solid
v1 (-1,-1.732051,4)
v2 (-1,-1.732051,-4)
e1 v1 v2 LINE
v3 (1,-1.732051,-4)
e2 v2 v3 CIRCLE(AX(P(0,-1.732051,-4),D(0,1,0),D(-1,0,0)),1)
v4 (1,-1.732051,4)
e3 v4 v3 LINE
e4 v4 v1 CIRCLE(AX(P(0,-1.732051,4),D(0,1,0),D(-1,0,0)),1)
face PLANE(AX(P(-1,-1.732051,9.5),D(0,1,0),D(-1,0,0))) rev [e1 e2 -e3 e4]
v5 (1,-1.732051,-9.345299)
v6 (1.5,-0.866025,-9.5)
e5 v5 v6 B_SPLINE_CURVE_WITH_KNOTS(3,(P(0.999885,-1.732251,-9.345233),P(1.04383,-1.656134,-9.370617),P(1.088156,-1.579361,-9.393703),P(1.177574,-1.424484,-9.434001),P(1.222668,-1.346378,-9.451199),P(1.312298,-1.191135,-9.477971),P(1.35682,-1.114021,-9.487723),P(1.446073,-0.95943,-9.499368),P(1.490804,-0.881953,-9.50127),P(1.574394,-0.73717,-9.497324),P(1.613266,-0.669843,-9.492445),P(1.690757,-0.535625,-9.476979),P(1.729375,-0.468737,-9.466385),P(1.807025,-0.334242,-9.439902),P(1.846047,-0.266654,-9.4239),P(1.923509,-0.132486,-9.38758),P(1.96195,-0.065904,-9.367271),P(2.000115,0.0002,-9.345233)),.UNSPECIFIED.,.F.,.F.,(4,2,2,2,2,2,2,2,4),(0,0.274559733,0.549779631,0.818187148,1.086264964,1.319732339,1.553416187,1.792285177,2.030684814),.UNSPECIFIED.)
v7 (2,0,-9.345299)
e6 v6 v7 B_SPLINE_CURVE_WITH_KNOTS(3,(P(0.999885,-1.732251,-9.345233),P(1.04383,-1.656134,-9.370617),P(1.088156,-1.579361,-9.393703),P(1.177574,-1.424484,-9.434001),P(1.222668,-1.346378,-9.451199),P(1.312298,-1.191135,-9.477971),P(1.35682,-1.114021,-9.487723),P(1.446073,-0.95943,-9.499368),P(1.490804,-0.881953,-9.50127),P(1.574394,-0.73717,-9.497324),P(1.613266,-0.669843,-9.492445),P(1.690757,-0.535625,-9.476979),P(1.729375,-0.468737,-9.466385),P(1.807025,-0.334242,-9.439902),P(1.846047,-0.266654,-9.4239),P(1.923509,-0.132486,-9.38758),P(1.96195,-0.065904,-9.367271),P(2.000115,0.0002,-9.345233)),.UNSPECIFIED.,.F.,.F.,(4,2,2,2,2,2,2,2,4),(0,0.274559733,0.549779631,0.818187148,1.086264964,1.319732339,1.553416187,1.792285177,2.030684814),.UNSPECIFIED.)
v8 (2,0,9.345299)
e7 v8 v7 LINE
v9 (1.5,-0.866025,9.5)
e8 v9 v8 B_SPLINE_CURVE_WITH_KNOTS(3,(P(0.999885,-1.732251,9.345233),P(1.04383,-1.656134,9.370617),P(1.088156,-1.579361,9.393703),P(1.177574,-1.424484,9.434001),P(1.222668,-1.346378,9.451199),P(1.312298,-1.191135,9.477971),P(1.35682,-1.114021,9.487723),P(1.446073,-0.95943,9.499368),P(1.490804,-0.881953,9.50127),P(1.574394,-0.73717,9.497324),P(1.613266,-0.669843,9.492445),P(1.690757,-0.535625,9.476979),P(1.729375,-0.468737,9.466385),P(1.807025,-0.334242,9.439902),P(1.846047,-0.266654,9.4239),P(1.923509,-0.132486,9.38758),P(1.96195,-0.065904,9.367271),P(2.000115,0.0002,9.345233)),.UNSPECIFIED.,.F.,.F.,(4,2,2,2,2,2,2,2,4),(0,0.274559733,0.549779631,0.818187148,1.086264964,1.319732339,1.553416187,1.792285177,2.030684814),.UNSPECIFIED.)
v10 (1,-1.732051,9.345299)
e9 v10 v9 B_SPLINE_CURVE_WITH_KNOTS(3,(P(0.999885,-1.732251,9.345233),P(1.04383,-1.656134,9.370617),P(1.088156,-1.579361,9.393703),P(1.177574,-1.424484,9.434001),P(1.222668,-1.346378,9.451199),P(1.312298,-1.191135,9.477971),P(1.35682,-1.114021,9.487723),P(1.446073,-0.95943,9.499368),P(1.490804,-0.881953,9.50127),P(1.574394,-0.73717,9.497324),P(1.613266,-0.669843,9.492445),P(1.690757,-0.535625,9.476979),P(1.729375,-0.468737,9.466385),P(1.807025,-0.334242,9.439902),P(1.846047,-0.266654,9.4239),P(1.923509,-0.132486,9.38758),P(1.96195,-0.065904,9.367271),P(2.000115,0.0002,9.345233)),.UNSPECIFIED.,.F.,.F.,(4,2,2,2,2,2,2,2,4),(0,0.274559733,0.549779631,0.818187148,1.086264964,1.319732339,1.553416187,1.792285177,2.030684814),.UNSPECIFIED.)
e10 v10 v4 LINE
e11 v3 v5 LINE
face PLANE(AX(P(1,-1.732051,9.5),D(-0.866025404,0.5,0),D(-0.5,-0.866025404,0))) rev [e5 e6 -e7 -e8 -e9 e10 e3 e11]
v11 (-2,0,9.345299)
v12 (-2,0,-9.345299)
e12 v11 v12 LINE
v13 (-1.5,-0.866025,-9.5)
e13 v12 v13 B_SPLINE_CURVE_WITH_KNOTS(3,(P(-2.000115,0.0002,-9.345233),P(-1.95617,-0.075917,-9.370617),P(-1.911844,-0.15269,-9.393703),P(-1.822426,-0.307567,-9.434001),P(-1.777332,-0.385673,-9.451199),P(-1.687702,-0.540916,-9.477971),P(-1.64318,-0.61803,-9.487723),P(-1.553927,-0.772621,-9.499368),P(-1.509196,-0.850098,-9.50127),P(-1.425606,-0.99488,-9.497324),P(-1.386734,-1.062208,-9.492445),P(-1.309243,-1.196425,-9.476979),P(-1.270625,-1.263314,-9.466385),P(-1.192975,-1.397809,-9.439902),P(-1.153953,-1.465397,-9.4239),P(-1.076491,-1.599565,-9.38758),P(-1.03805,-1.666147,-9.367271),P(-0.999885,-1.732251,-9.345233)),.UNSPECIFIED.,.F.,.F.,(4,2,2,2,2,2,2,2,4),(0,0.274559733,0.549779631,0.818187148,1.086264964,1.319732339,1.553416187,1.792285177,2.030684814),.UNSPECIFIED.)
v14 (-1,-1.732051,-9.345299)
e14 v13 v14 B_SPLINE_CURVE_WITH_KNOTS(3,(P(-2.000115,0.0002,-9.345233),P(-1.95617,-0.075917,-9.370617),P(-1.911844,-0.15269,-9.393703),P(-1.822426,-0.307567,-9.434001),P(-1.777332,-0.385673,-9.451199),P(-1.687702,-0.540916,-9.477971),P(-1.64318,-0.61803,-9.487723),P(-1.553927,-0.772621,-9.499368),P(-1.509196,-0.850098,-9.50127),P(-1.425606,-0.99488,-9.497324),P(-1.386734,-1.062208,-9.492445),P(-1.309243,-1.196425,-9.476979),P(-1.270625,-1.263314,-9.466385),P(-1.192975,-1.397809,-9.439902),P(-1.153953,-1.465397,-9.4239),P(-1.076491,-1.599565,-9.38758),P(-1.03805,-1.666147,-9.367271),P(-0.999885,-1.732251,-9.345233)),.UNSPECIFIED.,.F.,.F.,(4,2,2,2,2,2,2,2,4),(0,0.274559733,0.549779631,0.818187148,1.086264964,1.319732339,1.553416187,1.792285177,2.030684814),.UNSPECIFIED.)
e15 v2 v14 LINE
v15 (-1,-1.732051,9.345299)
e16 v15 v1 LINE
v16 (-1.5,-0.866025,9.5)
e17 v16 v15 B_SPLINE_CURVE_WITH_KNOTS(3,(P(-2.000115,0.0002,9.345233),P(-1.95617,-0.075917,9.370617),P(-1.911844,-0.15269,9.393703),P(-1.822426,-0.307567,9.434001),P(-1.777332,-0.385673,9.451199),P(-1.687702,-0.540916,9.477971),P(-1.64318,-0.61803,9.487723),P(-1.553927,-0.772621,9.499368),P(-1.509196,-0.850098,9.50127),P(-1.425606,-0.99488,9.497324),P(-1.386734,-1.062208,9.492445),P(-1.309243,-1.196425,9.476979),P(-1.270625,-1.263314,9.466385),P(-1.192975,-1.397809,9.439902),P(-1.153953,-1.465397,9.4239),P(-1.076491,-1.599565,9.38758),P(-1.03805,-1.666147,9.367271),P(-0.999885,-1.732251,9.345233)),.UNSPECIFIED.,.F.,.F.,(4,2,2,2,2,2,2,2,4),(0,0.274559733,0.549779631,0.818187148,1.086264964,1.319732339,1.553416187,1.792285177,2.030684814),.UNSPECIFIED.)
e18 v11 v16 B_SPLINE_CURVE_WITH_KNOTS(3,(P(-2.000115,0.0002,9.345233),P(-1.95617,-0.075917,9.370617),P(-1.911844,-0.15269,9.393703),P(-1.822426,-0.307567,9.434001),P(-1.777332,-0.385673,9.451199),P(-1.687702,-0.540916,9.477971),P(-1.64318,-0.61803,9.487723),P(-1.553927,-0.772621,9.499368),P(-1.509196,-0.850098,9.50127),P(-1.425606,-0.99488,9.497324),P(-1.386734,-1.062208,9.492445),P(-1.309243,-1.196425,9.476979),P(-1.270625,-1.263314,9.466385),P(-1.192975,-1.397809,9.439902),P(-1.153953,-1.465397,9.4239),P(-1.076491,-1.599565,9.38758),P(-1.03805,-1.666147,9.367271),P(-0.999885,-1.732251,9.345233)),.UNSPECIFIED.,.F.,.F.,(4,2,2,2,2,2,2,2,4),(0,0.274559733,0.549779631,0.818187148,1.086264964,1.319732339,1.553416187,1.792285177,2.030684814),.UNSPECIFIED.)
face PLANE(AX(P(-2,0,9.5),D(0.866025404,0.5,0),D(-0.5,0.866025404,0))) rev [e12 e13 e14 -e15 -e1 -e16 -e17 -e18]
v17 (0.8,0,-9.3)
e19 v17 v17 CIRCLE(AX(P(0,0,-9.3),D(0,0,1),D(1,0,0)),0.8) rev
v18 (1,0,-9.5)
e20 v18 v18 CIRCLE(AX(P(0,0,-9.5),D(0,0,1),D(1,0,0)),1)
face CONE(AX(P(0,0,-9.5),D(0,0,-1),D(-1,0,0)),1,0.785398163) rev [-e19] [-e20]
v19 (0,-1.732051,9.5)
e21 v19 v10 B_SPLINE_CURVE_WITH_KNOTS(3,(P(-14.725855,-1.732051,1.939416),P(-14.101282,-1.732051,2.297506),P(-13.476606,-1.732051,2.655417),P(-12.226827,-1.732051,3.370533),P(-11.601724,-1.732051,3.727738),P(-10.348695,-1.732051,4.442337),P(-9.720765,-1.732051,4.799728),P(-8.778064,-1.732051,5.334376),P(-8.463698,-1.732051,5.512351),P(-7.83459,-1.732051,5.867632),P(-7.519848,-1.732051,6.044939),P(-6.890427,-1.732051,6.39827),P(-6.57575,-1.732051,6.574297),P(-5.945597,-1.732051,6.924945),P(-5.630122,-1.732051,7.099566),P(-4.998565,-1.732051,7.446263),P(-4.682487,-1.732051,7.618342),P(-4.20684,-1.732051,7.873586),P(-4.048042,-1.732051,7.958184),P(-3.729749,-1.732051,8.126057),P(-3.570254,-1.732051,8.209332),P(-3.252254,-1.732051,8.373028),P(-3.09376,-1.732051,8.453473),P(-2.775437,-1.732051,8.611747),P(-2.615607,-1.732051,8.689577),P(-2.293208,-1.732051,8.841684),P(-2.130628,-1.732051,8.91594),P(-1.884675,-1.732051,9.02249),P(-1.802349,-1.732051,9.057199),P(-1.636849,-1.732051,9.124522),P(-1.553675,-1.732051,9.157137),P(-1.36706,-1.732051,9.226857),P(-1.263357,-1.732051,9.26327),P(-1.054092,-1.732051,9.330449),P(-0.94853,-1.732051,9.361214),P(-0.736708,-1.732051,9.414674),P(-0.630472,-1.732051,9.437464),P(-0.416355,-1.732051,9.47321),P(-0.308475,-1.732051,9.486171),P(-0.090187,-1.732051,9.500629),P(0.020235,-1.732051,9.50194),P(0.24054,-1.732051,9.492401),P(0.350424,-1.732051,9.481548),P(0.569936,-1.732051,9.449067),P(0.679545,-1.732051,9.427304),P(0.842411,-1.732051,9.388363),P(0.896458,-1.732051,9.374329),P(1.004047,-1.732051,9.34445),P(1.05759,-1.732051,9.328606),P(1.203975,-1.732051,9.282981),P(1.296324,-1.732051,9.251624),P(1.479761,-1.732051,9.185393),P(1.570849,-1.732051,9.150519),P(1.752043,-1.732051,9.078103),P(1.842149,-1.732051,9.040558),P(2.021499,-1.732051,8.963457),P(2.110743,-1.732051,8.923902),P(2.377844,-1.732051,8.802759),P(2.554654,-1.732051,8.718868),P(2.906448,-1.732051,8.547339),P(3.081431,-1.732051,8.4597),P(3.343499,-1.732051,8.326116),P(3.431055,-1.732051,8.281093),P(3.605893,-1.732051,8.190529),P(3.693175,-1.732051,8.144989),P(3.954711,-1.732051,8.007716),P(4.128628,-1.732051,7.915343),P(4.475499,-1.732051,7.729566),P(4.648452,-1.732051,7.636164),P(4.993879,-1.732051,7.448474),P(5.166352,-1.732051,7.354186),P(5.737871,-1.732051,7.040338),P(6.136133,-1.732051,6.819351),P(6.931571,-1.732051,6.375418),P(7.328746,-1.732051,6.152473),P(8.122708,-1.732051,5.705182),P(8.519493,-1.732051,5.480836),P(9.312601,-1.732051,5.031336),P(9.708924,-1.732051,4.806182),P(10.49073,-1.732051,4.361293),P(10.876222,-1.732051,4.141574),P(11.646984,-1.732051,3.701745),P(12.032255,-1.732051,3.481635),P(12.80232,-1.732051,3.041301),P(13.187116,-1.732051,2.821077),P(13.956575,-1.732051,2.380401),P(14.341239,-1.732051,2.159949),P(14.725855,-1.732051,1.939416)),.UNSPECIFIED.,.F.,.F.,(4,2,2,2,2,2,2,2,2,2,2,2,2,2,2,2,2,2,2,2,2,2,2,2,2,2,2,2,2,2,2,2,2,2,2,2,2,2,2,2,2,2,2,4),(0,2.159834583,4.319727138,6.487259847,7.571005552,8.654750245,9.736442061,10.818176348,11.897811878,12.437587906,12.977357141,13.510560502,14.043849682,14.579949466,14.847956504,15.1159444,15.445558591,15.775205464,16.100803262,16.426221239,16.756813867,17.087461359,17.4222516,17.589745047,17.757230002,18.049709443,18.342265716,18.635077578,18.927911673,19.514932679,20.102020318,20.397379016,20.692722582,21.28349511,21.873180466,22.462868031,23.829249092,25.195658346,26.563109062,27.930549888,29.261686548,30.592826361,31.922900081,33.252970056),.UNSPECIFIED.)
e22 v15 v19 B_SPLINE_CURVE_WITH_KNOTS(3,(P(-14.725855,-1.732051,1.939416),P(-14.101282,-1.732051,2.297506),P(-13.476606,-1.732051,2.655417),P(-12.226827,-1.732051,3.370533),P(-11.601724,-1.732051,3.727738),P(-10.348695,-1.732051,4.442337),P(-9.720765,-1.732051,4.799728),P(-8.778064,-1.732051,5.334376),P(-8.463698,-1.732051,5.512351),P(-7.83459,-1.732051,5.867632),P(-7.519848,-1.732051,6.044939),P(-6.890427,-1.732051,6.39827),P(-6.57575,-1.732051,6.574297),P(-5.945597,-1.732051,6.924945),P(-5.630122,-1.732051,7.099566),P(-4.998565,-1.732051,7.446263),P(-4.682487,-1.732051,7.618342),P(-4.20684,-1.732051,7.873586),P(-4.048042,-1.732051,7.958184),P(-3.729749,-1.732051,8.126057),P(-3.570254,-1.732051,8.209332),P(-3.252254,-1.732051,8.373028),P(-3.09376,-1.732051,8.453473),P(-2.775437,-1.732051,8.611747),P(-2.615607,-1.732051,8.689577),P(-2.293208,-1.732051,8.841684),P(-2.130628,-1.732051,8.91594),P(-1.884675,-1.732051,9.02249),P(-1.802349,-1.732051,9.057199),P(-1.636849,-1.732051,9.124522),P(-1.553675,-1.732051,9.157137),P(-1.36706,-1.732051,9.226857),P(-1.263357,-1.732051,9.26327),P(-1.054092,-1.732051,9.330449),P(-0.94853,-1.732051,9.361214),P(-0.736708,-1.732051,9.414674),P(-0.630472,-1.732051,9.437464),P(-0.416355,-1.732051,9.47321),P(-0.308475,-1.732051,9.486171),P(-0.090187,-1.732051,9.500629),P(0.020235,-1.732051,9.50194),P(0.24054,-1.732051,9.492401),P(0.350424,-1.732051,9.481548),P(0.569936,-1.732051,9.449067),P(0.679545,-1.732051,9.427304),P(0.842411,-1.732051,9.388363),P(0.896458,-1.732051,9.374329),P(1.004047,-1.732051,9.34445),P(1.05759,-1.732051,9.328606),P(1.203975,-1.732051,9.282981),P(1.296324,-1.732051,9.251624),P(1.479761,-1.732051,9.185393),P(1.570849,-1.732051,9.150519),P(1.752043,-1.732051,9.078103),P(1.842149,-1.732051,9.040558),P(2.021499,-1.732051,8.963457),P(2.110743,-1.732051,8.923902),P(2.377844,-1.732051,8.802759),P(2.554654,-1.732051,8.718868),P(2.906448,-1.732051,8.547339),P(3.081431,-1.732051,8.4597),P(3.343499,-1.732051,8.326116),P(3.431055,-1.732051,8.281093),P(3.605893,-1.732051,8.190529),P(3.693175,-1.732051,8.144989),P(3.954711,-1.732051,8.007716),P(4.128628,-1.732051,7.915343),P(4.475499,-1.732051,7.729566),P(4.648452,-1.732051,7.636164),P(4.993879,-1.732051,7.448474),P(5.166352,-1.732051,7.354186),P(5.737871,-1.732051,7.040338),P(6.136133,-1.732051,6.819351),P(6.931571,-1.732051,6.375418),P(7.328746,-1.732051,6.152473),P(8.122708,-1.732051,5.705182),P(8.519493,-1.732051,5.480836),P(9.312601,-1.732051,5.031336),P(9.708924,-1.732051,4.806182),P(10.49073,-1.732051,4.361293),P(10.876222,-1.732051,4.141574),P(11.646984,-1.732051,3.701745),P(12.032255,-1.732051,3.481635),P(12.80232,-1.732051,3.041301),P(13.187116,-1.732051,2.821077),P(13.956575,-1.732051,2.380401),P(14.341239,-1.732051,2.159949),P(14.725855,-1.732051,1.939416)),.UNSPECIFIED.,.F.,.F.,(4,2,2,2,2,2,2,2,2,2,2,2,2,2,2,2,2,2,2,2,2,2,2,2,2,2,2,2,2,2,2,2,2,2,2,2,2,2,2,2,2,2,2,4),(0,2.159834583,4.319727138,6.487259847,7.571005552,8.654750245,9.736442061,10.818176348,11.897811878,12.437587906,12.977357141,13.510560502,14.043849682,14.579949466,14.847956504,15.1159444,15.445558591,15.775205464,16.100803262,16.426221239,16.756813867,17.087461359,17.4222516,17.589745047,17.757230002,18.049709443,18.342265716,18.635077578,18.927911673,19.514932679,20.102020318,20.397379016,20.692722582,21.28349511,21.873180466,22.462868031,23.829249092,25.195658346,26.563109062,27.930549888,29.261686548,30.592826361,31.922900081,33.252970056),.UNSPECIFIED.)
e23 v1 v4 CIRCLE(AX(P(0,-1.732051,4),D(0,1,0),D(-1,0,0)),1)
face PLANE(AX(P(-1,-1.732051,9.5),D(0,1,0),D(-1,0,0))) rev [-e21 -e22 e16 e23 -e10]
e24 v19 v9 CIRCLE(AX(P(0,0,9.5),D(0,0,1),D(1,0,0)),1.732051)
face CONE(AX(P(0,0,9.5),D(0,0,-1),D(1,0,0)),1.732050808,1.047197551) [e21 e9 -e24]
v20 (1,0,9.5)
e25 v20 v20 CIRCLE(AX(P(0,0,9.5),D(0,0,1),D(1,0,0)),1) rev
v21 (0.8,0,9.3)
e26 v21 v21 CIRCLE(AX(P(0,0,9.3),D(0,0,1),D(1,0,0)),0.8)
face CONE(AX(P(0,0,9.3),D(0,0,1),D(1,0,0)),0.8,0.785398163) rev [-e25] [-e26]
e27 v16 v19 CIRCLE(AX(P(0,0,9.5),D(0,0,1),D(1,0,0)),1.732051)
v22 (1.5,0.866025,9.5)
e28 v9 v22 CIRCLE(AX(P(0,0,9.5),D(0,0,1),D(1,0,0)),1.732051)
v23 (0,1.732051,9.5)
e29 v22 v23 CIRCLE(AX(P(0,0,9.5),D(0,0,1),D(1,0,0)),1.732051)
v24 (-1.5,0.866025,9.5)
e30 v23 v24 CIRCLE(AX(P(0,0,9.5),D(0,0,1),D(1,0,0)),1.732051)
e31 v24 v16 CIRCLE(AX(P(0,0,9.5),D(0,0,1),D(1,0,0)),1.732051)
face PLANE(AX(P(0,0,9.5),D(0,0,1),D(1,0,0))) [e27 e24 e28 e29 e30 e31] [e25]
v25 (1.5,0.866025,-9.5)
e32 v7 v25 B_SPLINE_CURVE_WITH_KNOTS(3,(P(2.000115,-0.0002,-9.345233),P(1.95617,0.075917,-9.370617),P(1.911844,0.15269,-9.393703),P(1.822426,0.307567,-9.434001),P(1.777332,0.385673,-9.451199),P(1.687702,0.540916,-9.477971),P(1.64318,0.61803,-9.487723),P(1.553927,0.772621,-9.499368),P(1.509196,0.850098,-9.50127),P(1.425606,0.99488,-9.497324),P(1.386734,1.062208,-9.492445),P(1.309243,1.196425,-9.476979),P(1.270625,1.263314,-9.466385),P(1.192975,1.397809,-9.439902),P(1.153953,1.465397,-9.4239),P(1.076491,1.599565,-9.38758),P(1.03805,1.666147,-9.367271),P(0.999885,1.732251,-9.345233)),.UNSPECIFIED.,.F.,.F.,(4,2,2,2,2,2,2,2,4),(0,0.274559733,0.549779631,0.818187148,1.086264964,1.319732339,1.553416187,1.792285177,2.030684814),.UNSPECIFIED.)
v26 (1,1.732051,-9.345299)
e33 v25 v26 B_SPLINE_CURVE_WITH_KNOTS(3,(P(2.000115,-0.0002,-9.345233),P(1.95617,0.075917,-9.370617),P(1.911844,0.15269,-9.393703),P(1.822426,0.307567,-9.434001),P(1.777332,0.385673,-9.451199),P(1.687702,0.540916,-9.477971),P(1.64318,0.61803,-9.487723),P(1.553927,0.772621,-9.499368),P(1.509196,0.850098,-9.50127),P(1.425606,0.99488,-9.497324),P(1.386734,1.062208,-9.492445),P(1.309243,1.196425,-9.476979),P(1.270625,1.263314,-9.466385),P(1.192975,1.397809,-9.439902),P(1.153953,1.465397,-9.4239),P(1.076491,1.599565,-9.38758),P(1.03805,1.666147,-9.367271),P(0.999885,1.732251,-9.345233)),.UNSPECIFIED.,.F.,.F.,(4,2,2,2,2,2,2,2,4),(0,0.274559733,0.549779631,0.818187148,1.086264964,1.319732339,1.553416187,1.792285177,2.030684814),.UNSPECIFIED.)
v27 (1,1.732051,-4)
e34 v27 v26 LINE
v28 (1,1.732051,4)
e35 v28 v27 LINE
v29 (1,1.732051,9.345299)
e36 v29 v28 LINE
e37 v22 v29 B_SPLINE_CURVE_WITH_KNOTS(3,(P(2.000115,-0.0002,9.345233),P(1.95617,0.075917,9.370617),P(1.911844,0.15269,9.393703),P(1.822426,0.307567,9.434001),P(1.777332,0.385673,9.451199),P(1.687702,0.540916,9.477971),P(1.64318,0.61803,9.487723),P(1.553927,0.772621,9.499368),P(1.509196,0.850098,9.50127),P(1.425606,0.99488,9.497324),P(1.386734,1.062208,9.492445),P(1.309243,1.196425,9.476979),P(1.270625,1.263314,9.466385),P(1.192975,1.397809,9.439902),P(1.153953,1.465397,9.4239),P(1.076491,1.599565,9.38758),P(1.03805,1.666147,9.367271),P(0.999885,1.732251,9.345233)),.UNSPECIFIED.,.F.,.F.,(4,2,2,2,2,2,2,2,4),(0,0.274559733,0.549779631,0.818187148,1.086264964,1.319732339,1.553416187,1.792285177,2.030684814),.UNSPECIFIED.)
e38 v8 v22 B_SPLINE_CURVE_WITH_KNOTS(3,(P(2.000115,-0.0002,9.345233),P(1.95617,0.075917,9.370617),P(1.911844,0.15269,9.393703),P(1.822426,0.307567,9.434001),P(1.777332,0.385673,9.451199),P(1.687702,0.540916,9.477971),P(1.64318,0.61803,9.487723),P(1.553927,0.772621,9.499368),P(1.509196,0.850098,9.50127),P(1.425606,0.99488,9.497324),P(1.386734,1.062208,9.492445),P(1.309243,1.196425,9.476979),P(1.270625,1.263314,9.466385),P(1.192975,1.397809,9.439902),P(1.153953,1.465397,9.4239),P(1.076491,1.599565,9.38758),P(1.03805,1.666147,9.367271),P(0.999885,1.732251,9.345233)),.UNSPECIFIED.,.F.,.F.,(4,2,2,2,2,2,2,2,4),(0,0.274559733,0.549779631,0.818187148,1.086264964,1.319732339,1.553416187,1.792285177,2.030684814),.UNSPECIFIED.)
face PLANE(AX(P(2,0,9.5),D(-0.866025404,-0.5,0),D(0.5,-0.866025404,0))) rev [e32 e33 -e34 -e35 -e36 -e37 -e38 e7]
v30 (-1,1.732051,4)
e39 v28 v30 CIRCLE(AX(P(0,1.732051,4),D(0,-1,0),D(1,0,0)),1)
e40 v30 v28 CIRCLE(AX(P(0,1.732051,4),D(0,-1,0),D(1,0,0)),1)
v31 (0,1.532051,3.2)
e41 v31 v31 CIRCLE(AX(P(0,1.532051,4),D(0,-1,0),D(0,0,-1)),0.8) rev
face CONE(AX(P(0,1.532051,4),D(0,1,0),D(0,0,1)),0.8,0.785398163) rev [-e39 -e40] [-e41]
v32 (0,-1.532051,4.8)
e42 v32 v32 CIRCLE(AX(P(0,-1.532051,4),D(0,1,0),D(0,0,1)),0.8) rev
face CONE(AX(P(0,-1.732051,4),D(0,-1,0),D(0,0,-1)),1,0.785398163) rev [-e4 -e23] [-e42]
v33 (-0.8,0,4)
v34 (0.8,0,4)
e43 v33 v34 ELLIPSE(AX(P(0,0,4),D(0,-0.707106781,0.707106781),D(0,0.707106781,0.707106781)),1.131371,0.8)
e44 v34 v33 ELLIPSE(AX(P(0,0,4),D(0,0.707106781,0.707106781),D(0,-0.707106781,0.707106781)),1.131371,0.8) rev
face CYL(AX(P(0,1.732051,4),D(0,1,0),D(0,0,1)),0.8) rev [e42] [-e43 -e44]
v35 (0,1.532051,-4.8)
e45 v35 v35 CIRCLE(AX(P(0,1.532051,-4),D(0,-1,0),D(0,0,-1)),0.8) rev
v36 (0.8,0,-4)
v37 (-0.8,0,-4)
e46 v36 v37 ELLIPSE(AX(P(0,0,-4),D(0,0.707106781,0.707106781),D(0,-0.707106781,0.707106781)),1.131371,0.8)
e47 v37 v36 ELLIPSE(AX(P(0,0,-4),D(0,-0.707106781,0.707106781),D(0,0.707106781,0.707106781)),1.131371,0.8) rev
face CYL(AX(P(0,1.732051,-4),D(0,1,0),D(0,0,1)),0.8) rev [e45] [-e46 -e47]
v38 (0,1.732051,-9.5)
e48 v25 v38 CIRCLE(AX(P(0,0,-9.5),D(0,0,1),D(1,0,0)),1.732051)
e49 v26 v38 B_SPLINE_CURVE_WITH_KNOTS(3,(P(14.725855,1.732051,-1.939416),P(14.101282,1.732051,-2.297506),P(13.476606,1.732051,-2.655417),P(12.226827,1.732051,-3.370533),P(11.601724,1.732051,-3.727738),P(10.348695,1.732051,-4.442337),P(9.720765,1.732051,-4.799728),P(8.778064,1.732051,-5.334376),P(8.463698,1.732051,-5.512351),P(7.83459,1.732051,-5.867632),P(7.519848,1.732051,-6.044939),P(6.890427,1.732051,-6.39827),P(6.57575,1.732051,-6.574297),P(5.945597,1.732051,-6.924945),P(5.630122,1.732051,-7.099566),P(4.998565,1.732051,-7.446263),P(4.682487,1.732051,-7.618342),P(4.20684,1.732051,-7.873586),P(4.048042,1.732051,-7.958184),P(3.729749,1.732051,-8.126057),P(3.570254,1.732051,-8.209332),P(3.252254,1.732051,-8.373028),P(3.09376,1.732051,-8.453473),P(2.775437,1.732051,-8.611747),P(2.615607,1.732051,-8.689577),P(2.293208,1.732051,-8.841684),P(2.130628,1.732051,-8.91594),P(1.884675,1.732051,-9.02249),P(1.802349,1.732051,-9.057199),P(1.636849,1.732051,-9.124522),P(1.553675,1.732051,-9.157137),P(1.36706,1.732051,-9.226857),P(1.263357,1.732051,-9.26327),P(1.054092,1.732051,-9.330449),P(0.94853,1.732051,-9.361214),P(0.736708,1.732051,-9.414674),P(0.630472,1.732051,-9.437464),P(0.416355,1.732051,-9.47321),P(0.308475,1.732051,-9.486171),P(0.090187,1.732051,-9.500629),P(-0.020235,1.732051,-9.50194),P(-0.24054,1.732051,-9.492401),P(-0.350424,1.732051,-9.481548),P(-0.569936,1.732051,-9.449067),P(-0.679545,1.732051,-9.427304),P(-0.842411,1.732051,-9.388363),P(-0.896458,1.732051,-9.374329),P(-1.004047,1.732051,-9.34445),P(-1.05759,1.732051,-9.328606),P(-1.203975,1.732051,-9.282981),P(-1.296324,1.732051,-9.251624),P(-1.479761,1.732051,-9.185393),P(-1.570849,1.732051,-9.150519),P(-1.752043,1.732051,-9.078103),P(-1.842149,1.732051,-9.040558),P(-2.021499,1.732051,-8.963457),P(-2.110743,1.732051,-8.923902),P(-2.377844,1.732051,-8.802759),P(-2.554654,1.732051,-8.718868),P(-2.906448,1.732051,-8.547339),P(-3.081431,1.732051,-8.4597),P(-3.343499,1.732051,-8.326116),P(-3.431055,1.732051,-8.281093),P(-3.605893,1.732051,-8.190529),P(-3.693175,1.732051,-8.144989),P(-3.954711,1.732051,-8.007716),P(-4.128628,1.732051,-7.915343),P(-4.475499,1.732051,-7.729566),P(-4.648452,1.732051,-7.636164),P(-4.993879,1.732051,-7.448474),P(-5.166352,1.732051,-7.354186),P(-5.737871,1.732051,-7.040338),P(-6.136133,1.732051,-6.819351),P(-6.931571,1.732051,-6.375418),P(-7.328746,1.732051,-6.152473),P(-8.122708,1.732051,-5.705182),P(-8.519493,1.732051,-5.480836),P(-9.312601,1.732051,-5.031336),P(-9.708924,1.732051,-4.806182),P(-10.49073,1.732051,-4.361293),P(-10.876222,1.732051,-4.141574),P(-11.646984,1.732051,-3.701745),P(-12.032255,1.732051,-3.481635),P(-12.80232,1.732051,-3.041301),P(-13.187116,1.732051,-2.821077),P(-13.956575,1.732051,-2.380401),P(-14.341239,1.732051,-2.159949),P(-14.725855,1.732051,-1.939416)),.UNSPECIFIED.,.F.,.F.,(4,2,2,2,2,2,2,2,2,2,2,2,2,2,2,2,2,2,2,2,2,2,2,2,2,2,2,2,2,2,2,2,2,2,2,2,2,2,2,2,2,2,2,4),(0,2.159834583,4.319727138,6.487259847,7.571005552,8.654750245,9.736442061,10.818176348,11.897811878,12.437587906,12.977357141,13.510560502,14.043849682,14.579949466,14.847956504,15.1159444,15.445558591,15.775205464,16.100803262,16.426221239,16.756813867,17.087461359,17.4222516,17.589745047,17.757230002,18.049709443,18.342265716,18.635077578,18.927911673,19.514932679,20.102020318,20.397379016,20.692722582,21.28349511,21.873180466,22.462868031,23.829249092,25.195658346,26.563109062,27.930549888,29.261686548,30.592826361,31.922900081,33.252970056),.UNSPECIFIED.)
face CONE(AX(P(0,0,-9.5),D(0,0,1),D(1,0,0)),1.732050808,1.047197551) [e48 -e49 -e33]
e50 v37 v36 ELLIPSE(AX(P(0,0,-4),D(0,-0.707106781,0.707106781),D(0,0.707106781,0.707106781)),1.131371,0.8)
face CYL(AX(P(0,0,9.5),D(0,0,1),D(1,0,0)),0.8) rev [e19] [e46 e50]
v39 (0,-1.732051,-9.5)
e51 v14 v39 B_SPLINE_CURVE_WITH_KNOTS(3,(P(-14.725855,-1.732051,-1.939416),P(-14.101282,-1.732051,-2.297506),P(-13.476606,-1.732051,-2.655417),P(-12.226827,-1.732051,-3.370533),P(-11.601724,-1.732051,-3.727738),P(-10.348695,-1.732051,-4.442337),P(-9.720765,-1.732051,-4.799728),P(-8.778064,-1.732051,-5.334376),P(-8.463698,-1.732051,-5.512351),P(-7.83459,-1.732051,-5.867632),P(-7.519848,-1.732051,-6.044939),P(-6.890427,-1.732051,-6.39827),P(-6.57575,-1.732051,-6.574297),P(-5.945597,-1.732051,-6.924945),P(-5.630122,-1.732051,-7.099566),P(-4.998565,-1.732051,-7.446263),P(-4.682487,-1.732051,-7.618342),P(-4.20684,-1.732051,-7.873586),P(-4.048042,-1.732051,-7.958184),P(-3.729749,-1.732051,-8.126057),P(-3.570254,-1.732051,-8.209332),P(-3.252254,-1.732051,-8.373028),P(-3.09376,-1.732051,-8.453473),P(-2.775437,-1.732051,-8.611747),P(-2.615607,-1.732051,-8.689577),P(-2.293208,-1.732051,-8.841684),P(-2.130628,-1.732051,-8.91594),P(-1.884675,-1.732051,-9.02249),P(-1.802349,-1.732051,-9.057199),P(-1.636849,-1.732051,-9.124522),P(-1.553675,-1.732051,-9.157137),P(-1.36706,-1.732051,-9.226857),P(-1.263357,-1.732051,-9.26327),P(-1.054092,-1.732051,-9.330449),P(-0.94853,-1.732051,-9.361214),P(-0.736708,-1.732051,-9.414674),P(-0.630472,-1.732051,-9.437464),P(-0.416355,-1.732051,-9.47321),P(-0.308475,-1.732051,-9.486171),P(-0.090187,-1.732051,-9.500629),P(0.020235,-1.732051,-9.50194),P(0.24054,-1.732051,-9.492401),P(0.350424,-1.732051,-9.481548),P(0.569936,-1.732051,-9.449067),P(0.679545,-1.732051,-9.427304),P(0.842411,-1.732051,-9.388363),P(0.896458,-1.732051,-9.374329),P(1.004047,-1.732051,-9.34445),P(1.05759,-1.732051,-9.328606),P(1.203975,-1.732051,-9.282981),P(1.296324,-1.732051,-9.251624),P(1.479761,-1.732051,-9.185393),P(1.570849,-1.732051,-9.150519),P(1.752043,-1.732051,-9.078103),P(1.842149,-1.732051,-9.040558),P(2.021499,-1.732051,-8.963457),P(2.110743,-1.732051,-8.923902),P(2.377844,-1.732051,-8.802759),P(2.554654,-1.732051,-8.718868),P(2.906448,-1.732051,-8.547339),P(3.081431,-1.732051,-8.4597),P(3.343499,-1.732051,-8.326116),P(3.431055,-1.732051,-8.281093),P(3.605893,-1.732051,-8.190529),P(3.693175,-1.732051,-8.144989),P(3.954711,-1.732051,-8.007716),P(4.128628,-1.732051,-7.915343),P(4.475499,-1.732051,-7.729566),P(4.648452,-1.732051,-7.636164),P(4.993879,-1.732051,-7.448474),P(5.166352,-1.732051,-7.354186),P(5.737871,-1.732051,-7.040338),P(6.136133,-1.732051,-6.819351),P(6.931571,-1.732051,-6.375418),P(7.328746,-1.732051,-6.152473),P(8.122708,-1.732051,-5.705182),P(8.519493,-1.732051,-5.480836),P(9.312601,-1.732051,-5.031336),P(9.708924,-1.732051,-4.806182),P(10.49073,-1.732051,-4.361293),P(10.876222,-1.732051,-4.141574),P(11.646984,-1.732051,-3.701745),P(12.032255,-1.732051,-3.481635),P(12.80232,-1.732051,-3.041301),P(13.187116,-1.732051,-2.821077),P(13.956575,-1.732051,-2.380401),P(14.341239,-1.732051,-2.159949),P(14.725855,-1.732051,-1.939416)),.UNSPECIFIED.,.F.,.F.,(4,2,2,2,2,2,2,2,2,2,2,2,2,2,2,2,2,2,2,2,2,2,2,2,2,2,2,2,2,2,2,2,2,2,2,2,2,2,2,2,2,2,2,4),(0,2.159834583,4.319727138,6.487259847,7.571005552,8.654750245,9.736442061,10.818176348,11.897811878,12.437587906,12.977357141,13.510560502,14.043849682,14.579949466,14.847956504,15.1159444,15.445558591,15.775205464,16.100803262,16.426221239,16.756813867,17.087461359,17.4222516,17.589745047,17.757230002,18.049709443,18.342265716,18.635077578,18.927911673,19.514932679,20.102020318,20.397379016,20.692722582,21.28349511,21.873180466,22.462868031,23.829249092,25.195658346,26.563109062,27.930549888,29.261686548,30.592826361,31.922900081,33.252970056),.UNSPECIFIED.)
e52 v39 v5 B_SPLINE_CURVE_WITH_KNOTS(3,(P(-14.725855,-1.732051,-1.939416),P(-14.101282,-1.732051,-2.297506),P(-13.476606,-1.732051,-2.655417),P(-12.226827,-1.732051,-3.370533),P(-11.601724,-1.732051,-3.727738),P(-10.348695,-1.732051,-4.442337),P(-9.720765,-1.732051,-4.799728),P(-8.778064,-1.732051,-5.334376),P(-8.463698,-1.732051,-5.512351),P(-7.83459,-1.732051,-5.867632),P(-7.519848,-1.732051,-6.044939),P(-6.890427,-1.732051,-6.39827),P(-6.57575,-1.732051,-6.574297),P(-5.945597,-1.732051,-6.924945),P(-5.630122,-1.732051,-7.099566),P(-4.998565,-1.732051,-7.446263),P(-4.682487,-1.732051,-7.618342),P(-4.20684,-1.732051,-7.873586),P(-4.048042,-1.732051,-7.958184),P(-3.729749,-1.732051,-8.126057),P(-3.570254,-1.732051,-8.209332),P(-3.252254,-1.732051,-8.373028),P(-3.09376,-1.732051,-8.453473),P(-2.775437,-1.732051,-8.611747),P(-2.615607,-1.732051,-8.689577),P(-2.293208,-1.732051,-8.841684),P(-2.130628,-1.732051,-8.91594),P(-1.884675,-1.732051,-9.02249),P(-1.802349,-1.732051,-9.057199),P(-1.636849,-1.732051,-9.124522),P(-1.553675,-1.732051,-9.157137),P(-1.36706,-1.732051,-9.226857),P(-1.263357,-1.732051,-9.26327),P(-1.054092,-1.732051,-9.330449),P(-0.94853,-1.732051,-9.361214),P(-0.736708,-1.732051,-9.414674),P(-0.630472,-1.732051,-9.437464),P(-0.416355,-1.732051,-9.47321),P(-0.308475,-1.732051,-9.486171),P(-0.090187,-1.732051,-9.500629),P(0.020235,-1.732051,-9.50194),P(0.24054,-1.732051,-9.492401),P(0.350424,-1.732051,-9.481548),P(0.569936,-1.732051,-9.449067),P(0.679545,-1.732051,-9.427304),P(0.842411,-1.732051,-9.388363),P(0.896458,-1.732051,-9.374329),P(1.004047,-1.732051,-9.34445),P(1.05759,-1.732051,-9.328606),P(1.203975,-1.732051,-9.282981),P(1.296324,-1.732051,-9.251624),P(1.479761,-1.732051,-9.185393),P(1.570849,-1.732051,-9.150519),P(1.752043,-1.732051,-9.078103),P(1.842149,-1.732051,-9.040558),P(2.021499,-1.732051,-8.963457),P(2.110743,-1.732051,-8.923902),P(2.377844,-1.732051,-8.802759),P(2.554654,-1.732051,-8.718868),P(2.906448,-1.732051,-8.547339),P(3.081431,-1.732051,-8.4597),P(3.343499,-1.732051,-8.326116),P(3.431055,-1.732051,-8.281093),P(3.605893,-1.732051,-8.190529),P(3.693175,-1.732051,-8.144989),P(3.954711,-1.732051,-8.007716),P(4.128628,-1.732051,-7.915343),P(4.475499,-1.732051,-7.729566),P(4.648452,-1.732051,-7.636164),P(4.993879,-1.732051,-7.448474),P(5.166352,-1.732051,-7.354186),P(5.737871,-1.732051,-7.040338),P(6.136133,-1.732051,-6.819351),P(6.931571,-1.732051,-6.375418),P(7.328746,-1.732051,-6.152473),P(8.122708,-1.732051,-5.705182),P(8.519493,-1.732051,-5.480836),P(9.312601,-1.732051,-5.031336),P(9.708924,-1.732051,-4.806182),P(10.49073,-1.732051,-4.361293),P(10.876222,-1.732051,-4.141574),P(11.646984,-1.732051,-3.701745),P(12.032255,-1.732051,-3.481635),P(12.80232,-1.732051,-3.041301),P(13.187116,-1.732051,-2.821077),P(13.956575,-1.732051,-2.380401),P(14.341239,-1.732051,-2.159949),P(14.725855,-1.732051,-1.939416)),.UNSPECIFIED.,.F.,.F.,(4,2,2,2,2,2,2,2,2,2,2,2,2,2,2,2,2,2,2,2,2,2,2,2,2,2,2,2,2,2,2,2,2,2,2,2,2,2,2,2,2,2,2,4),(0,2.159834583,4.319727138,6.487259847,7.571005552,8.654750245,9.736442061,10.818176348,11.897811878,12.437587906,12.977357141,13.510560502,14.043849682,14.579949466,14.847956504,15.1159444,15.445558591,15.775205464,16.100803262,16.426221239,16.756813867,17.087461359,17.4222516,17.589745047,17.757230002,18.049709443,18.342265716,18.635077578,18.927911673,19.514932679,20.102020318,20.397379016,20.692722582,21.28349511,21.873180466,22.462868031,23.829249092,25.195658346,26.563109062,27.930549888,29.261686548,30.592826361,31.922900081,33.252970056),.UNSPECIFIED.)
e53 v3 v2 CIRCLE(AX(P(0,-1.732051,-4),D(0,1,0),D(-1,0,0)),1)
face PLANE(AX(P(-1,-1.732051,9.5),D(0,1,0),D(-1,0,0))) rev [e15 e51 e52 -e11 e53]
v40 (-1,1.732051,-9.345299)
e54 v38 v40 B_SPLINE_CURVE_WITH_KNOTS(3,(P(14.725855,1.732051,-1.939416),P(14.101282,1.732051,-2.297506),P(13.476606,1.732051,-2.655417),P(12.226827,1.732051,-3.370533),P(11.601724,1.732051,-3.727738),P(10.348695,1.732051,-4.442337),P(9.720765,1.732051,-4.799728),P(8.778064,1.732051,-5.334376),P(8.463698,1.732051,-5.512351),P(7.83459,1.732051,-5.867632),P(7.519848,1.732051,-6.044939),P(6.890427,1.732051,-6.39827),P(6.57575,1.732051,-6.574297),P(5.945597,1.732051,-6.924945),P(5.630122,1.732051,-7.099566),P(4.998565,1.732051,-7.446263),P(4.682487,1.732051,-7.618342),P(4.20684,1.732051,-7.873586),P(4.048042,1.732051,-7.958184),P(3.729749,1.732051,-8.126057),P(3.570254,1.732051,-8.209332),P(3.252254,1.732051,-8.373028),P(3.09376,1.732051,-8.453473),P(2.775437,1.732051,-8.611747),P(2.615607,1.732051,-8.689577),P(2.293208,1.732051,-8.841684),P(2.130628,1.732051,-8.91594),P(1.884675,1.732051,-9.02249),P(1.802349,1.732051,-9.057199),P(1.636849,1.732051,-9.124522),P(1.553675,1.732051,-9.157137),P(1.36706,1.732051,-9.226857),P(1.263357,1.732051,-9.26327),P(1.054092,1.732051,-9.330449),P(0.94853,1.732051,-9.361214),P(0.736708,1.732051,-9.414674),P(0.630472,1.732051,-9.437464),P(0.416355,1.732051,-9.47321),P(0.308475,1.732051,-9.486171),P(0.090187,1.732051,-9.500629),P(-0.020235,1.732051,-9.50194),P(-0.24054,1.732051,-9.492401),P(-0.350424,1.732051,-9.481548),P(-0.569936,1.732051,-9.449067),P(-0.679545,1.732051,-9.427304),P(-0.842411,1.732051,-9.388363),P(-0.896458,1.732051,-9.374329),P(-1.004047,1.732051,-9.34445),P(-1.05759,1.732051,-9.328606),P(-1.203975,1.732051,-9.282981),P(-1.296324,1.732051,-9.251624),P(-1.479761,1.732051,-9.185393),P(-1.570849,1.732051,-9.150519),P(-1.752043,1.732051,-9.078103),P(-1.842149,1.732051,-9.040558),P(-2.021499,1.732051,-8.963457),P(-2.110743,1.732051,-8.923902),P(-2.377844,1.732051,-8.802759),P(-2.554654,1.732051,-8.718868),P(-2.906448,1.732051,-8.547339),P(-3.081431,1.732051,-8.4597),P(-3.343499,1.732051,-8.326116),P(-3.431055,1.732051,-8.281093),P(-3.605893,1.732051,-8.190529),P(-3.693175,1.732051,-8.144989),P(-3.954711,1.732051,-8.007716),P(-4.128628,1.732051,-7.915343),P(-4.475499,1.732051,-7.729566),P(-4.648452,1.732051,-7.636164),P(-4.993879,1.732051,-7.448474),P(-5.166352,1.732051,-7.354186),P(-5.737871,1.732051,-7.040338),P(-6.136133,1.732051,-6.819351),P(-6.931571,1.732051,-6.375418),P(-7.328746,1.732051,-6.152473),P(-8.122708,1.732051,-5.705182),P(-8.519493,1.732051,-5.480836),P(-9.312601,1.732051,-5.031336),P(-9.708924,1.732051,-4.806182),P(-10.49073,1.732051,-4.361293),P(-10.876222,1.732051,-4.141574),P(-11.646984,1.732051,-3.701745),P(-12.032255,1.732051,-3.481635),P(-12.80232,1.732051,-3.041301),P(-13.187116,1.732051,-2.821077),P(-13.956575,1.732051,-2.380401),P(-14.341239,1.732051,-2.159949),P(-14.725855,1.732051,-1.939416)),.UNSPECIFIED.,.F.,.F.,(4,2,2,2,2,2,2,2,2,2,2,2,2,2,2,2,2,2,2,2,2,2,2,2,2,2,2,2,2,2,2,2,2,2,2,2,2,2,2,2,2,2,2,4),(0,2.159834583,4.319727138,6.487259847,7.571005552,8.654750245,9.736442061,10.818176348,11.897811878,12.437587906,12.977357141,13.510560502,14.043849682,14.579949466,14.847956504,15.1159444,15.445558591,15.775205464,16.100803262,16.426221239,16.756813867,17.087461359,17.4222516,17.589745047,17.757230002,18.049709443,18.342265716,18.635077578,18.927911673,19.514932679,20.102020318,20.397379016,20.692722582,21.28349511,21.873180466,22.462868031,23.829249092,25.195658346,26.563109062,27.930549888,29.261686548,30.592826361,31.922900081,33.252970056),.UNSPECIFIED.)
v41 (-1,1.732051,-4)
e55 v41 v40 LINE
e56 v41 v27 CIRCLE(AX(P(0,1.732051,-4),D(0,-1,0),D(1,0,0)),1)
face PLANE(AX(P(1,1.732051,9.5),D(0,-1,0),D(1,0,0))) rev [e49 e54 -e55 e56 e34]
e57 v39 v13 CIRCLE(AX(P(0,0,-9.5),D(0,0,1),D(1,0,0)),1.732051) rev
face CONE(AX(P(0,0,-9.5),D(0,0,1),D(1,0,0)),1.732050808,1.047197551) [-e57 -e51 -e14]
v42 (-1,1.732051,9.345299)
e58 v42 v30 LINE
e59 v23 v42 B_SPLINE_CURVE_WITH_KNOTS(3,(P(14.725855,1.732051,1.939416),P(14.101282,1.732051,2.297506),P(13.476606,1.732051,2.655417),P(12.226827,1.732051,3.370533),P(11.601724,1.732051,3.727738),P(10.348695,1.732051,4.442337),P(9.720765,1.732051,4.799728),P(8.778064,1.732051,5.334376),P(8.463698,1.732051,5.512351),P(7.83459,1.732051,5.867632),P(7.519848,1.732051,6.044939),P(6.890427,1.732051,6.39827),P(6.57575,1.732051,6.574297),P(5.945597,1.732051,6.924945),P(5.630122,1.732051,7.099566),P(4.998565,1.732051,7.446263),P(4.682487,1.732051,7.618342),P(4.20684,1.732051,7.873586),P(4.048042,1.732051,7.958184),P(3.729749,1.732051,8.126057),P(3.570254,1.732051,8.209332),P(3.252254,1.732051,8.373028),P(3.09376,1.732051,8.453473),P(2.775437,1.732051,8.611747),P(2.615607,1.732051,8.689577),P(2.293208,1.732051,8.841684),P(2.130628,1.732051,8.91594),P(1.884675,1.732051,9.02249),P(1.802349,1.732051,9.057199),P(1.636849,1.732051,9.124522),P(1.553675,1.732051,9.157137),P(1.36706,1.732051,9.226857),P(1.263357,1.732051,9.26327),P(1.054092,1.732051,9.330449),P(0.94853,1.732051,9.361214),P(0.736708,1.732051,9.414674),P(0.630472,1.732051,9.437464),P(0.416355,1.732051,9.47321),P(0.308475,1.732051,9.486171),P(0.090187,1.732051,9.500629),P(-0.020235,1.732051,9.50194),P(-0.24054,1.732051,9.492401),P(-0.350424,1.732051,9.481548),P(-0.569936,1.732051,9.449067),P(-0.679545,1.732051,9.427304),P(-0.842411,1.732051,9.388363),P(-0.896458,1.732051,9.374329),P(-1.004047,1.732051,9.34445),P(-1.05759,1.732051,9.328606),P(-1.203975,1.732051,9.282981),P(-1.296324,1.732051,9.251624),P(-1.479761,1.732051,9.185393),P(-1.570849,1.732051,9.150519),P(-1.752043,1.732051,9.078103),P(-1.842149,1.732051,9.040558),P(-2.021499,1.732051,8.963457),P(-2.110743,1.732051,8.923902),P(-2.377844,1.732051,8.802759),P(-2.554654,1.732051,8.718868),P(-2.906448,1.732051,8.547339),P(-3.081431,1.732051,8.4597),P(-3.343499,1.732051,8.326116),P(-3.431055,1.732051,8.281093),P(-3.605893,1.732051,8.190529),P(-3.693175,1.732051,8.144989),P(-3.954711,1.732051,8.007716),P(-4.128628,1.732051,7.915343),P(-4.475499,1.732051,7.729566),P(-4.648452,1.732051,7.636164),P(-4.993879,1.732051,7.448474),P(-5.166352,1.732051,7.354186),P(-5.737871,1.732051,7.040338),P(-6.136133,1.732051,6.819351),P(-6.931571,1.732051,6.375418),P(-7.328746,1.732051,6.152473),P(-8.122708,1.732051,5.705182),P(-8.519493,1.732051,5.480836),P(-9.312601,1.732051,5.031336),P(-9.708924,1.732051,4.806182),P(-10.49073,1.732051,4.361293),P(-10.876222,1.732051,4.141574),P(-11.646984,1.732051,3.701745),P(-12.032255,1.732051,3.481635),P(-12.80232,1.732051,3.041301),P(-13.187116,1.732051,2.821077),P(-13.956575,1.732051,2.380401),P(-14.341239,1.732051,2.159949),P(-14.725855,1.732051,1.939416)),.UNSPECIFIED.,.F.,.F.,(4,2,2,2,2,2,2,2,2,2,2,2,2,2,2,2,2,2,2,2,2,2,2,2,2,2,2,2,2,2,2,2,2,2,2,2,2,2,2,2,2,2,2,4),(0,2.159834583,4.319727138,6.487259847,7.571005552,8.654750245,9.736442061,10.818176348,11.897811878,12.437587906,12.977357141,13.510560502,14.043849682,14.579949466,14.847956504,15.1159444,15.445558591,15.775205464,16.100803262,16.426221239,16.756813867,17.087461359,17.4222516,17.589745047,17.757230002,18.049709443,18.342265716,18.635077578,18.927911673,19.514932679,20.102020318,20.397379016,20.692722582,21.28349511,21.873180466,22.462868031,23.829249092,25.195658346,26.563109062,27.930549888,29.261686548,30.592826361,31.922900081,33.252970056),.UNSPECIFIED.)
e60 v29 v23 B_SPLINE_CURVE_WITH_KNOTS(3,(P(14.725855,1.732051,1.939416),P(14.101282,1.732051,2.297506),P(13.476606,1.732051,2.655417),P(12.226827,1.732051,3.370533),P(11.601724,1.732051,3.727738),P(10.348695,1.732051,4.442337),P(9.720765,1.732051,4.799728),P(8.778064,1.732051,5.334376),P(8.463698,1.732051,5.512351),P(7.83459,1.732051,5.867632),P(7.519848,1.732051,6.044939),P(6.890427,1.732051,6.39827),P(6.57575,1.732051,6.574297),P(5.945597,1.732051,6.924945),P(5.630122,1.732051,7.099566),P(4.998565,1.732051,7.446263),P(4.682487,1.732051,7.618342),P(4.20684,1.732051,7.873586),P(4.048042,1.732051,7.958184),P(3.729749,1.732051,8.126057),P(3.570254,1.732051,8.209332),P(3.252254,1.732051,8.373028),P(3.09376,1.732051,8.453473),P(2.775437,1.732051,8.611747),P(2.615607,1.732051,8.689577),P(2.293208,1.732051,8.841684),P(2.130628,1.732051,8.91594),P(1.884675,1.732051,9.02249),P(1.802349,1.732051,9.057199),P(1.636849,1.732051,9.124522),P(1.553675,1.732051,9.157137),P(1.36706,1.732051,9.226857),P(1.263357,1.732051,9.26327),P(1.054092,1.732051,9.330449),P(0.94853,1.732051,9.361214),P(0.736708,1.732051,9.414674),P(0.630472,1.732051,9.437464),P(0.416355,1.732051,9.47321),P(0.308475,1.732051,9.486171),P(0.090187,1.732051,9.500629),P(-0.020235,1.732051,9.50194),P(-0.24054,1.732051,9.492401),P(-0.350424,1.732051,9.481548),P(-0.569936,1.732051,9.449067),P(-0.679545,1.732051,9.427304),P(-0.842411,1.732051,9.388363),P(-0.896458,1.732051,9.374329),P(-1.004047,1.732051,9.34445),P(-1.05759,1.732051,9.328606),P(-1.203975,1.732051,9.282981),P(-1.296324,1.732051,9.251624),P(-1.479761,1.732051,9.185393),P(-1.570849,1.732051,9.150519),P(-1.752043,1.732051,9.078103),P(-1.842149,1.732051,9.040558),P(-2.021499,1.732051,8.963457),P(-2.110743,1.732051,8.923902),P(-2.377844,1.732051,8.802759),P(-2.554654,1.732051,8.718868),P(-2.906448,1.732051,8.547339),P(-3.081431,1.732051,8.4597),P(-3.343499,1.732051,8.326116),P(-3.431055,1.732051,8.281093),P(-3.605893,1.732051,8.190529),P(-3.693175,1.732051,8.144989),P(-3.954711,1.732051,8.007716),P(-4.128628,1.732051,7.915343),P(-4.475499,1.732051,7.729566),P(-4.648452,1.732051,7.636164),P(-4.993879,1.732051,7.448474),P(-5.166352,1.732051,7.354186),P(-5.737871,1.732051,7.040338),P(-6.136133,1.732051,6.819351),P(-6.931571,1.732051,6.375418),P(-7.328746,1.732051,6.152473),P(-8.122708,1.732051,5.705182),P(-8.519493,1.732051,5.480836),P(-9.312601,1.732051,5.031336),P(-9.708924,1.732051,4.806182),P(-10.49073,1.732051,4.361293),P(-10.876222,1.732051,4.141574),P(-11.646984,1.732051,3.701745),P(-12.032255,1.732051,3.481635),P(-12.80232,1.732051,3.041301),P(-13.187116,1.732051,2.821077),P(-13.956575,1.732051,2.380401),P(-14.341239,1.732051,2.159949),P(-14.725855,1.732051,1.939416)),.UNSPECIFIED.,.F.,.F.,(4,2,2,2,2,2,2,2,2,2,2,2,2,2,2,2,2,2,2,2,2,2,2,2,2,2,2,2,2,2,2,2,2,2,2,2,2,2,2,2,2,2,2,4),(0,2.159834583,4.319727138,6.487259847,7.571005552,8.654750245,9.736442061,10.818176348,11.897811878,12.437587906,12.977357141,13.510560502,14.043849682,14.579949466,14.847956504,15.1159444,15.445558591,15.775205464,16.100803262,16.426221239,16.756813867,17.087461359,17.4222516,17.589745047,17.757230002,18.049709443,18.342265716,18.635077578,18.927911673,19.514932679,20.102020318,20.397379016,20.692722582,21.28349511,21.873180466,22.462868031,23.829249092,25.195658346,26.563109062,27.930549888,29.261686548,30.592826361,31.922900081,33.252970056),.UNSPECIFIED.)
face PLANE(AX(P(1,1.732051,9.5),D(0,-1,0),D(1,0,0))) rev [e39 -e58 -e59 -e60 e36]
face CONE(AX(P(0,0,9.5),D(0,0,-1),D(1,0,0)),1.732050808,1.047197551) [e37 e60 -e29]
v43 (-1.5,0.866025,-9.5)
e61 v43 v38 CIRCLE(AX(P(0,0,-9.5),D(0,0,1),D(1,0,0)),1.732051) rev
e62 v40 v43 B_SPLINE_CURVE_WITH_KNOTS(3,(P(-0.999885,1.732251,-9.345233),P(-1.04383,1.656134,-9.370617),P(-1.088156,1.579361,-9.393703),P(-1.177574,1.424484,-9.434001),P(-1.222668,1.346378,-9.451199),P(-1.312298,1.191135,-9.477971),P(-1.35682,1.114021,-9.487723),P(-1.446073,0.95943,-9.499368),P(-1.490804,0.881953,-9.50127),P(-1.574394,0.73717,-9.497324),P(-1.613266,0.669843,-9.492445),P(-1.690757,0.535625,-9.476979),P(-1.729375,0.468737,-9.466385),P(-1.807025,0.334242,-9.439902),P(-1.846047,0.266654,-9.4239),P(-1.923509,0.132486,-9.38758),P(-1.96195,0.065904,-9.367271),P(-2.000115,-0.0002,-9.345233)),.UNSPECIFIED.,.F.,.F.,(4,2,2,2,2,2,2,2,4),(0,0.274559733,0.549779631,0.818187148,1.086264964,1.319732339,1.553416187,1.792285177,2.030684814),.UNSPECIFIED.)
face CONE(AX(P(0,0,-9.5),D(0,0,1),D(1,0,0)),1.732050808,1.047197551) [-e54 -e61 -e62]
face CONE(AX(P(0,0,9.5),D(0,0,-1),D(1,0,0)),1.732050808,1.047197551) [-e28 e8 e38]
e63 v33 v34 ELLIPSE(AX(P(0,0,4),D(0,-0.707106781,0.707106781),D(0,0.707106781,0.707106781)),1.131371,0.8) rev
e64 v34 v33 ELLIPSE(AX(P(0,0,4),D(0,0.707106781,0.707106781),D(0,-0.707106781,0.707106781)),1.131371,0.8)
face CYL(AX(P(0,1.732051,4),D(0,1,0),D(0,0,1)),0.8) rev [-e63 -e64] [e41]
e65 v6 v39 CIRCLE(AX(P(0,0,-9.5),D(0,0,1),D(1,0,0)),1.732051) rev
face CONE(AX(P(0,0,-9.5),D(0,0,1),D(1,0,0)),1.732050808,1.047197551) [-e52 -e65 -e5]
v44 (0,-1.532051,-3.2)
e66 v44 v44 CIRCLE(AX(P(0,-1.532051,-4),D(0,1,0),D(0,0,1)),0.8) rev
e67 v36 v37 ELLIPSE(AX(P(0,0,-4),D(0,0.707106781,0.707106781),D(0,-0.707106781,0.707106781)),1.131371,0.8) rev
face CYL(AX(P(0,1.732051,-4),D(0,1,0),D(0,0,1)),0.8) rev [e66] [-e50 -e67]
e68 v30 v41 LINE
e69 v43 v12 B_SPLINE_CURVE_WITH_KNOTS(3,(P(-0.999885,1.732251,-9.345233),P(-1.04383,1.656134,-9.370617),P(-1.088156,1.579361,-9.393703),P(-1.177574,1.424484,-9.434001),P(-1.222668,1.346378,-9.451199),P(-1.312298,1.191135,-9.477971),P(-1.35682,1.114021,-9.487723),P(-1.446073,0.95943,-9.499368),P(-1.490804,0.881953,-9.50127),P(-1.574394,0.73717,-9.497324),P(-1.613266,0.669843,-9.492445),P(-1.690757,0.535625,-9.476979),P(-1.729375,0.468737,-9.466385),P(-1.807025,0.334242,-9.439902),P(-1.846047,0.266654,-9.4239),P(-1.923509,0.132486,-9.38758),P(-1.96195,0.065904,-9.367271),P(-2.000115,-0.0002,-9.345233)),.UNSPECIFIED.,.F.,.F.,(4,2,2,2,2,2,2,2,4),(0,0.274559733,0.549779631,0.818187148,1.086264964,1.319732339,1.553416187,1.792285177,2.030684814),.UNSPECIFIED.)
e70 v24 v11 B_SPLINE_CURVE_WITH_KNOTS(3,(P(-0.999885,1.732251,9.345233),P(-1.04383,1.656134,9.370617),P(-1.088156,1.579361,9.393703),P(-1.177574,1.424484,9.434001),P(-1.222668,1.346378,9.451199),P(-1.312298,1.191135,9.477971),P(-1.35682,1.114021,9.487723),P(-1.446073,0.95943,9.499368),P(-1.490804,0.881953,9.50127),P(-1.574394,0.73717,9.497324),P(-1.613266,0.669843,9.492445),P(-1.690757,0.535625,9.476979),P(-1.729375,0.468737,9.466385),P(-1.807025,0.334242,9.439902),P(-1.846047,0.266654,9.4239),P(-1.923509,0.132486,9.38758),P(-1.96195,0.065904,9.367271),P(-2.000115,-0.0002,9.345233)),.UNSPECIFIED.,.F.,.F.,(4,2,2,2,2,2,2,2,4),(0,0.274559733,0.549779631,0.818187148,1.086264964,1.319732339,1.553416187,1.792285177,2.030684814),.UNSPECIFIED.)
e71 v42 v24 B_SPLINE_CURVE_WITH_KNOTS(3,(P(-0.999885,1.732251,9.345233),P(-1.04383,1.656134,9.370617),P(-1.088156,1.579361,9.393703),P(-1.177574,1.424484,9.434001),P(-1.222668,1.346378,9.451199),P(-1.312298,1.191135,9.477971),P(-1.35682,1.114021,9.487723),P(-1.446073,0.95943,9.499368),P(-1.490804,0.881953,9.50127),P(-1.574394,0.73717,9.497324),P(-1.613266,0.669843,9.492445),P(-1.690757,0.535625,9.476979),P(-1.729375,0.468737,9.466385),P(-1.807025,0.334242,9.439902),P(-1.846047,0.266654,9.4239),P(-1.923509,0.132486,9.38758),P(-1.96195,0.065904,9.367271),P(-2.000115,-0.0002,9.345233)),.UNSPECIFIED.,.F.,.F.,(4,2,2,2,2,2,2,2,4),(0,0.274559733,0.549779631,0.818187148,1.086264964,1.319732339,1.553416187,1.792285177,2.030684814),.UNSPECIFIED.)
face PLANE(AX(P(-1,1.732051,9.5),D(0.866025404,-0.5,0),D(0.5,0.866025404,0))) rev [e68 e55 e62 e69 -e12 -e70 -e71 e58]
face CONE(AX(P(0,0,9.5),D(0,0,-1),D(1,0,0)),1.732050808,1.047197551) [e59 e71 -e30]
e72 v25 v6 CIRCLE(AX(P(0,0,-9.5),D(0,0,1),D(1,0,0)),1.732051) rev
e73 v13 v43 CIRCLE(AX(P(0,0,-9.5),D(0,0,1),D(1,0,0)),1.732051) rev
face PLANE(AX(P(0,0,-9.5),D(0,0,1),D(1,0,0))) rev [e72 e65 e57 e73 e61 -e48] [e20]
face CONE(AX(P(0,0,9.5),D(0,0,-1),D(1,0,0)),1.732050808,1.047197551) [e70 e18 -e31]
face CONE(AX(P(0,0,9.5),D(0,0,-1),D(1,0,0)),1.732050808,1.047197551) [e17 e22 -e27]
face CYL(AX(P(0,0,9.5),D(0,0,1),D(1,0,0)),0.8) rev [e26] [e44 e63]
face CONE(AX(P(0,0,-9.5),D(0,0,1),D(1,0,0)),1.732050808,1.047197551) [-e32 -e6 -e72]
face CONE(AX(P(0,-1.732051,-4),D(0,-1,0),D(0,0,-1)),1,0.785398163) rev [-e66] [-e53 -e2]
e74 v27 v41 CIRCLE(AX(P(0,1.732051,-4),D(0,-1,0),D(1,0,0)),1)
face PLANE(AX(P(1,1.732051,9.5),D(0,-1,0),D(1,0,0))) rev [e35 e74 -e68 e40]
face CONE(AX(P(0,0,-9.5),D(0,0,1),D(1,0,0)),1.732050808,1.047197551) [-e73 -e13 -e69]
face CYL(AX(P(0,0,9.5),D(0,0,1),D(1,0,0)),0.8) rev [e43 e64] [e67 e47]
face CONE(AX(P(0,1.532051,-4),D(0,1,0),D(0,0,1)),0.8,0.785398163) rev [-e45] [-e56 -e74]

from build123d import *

# Parameters (mm, degrees)
EXTRUDE_1_DEPTH          = 9.5
SKETCH_2_OUTSIDE_W       = 79.862
SKETCH_2_OUTSIDE_H       = 79.326
SKETCH_2_OUTSIDE_R       = 1.732050808
CUT_EXTRUDE_1_DEPTH      = 20.183326093
CUT_EXTRUDE_1_DRAFT      = -60
HOLE_WIZARD_M2_1_D       = 1.6
HOLE_WIZARD_M2_2_D       = 1.6
MIRROR_1_COPY_1_SKETCH_W = 79.862
MIRROR_1_COPY_1_SKETCH_H = 79.326
MIRROR_1_COPY_1_SKETCH_R = 1.732050808
MIRROR_1_COPY_1_DEPTH    = 20.183326093
MIRROR_1_COPY_1_DRAFT    = -60
CHAMFER_1_SIZE           = 0.2


with BuildPart() as part:
    # 草图1 → 凸台-拉伸1 (new, symmetric)
    with BuildSketch(Plane.XY):
        Polygon((2, 0), (1, 1.732050808), (-1, 1.732050808), (-2, 0), (-1, -1.732050808), (1, -1.732050808), align=None)
    extrude(amount=EXTRUDE_1_DEPTH, both=True)


with BuildPart() as cut_extrude_1_tool:
    # 草图2 outside → 切除-拉伸1 (with draft: the straight prism first)
    with BuildSketch(Plane.XY.offset(9.5)):
        Rectangle(SKETCH_2_OUTSIDE_W, SKETCH_2_OUTSIDE_H)
        Circle(SKETCH_2_OUTSIDE_R, mode=Mode.SUBTRACT)
    extrude(amount=-CUT_EXTRUDE_1_DEPTH)
    # 切除-拉伸1: the draft: its side faces are tilted about the plane it starts from
    cut_extrude_1_sides = [cut_extrude_1_tool.faces().sort_by_distance(p)[0] for p in [
        (0, -39.663, -0.591663047),
        (39.931, 0, -0.591663047),
        (0, 39.663, -0.591663047),
        (-39.931, 0, -0.591663047),
        (-1.732050808, 0, -0.591663047),
    ]]
    draft(cut_extrude_1_sides, Plane.XY.offset(9.5), CUT_EXTRUDE_1_DRAFT)


with BuildPart() as part_1:
    add(part.part)

    # 切除-拉伸1: cut by cut_extrude_1_tool
    add(cut_extrude_1_tool.part, mode=Mode.SUBTRACT)

    # M2 螺纹孔1 (through all)
    with Locations(Plane.XY.offset(9.5)):
        with Locations((0, 0)):
            hole_wizard_m2_1 = Hole(HOLE_WIZARD_M2_1_D / 2)

    # M2 螺纹孔2 (through all)
    with Locations(Plane(origin=(0, 1.732050808, 0), x_dir=(1, 0, 0), z_dir=(0, 1, 0))):
        with Locations((0, -4)):
            hole_wizard_m2_2 = Hole(HOLE_WIZARD_M2_2_D / 2)

    # 镜向1: M2 螺纹孔1, M2 螺纹孔2 across plane
    add(hole_wizard_m2_1.mirror(Plane.XY), mode=Mode.SUBTRACT)
    add(hole_wizard_m2_2.mirror(Plane.XY), mode=Mode.SUBTRACT)


with BuildPart() as mirror_1_copy_1_tool:
    # 镜向1 copy 1 sketch → 镜向1 copy 1 (with draft: the straight prism first)
    with BuildSketch(Plane(origin=(0, 0, -9.5), x_dir=(1, 0, 0), z_dir=(0, 0, -1))):
        Rectangle(MIRROR_1_COPY_1_SKETCH_W, MIRROR_1_COPY_1_SKETCH_H)
        Circle(MIRROR_1_COPY_1_SKETCH_R, mode=Mode.SUBTRACT)
    extrude(amount=-MIRROR_1_COPY_1_DEPTH)
    # 镜向1 copy 1: the draft: its side faces are tilted about the plane it starts from
    mirror_1_copy_1_sides = [mirror_1_copy_1_tool.faces().sort_by_distance(p)[0] for p in [
        (0, -39.663, 0.591663047),
        (39.931, 0, 0.591663047),
        (0, 39.663, 0.591663047),
        (-39.931, 0, 0.591663047),
        (-1.732050808, 0, 0.591663047),
    ]]
    draft(mirror_1_copy_1_sides, Plane(origin=(0, 0, -9.5), x_dir=(1, 0, 0), z_dir=(0, 0, -1)), MIRROR_1_COPY_1_DRAFT)


with BuildPart() as part_2:
    add(part_1.part)

    # 镜向1 copy 1: cut by mirror_1_copy_1_tool
    add(mirror_1_copy_1_tool.part, mode=Mode.SUBTRACT)

    # 倒角1
    chamfer_1_edges = [part_2.edges().sort_by_distance(p)[0] for p in [
        (0.8, -1.732050808, -4),
        (0.8, 1.732050808, -4),
        (0.8, 0, 9.5),
        (0.8, 0, -9.5),
        (0.8, -1.732050808, 4),
        (0.8, 1.732050808, 4),
    ]]
    chamfer(chamfer_1_edges, length=CHAMFER_1_SIZE - 0.0001)  # a hair under: the kernel refuses the full size


solid = part_2.part
